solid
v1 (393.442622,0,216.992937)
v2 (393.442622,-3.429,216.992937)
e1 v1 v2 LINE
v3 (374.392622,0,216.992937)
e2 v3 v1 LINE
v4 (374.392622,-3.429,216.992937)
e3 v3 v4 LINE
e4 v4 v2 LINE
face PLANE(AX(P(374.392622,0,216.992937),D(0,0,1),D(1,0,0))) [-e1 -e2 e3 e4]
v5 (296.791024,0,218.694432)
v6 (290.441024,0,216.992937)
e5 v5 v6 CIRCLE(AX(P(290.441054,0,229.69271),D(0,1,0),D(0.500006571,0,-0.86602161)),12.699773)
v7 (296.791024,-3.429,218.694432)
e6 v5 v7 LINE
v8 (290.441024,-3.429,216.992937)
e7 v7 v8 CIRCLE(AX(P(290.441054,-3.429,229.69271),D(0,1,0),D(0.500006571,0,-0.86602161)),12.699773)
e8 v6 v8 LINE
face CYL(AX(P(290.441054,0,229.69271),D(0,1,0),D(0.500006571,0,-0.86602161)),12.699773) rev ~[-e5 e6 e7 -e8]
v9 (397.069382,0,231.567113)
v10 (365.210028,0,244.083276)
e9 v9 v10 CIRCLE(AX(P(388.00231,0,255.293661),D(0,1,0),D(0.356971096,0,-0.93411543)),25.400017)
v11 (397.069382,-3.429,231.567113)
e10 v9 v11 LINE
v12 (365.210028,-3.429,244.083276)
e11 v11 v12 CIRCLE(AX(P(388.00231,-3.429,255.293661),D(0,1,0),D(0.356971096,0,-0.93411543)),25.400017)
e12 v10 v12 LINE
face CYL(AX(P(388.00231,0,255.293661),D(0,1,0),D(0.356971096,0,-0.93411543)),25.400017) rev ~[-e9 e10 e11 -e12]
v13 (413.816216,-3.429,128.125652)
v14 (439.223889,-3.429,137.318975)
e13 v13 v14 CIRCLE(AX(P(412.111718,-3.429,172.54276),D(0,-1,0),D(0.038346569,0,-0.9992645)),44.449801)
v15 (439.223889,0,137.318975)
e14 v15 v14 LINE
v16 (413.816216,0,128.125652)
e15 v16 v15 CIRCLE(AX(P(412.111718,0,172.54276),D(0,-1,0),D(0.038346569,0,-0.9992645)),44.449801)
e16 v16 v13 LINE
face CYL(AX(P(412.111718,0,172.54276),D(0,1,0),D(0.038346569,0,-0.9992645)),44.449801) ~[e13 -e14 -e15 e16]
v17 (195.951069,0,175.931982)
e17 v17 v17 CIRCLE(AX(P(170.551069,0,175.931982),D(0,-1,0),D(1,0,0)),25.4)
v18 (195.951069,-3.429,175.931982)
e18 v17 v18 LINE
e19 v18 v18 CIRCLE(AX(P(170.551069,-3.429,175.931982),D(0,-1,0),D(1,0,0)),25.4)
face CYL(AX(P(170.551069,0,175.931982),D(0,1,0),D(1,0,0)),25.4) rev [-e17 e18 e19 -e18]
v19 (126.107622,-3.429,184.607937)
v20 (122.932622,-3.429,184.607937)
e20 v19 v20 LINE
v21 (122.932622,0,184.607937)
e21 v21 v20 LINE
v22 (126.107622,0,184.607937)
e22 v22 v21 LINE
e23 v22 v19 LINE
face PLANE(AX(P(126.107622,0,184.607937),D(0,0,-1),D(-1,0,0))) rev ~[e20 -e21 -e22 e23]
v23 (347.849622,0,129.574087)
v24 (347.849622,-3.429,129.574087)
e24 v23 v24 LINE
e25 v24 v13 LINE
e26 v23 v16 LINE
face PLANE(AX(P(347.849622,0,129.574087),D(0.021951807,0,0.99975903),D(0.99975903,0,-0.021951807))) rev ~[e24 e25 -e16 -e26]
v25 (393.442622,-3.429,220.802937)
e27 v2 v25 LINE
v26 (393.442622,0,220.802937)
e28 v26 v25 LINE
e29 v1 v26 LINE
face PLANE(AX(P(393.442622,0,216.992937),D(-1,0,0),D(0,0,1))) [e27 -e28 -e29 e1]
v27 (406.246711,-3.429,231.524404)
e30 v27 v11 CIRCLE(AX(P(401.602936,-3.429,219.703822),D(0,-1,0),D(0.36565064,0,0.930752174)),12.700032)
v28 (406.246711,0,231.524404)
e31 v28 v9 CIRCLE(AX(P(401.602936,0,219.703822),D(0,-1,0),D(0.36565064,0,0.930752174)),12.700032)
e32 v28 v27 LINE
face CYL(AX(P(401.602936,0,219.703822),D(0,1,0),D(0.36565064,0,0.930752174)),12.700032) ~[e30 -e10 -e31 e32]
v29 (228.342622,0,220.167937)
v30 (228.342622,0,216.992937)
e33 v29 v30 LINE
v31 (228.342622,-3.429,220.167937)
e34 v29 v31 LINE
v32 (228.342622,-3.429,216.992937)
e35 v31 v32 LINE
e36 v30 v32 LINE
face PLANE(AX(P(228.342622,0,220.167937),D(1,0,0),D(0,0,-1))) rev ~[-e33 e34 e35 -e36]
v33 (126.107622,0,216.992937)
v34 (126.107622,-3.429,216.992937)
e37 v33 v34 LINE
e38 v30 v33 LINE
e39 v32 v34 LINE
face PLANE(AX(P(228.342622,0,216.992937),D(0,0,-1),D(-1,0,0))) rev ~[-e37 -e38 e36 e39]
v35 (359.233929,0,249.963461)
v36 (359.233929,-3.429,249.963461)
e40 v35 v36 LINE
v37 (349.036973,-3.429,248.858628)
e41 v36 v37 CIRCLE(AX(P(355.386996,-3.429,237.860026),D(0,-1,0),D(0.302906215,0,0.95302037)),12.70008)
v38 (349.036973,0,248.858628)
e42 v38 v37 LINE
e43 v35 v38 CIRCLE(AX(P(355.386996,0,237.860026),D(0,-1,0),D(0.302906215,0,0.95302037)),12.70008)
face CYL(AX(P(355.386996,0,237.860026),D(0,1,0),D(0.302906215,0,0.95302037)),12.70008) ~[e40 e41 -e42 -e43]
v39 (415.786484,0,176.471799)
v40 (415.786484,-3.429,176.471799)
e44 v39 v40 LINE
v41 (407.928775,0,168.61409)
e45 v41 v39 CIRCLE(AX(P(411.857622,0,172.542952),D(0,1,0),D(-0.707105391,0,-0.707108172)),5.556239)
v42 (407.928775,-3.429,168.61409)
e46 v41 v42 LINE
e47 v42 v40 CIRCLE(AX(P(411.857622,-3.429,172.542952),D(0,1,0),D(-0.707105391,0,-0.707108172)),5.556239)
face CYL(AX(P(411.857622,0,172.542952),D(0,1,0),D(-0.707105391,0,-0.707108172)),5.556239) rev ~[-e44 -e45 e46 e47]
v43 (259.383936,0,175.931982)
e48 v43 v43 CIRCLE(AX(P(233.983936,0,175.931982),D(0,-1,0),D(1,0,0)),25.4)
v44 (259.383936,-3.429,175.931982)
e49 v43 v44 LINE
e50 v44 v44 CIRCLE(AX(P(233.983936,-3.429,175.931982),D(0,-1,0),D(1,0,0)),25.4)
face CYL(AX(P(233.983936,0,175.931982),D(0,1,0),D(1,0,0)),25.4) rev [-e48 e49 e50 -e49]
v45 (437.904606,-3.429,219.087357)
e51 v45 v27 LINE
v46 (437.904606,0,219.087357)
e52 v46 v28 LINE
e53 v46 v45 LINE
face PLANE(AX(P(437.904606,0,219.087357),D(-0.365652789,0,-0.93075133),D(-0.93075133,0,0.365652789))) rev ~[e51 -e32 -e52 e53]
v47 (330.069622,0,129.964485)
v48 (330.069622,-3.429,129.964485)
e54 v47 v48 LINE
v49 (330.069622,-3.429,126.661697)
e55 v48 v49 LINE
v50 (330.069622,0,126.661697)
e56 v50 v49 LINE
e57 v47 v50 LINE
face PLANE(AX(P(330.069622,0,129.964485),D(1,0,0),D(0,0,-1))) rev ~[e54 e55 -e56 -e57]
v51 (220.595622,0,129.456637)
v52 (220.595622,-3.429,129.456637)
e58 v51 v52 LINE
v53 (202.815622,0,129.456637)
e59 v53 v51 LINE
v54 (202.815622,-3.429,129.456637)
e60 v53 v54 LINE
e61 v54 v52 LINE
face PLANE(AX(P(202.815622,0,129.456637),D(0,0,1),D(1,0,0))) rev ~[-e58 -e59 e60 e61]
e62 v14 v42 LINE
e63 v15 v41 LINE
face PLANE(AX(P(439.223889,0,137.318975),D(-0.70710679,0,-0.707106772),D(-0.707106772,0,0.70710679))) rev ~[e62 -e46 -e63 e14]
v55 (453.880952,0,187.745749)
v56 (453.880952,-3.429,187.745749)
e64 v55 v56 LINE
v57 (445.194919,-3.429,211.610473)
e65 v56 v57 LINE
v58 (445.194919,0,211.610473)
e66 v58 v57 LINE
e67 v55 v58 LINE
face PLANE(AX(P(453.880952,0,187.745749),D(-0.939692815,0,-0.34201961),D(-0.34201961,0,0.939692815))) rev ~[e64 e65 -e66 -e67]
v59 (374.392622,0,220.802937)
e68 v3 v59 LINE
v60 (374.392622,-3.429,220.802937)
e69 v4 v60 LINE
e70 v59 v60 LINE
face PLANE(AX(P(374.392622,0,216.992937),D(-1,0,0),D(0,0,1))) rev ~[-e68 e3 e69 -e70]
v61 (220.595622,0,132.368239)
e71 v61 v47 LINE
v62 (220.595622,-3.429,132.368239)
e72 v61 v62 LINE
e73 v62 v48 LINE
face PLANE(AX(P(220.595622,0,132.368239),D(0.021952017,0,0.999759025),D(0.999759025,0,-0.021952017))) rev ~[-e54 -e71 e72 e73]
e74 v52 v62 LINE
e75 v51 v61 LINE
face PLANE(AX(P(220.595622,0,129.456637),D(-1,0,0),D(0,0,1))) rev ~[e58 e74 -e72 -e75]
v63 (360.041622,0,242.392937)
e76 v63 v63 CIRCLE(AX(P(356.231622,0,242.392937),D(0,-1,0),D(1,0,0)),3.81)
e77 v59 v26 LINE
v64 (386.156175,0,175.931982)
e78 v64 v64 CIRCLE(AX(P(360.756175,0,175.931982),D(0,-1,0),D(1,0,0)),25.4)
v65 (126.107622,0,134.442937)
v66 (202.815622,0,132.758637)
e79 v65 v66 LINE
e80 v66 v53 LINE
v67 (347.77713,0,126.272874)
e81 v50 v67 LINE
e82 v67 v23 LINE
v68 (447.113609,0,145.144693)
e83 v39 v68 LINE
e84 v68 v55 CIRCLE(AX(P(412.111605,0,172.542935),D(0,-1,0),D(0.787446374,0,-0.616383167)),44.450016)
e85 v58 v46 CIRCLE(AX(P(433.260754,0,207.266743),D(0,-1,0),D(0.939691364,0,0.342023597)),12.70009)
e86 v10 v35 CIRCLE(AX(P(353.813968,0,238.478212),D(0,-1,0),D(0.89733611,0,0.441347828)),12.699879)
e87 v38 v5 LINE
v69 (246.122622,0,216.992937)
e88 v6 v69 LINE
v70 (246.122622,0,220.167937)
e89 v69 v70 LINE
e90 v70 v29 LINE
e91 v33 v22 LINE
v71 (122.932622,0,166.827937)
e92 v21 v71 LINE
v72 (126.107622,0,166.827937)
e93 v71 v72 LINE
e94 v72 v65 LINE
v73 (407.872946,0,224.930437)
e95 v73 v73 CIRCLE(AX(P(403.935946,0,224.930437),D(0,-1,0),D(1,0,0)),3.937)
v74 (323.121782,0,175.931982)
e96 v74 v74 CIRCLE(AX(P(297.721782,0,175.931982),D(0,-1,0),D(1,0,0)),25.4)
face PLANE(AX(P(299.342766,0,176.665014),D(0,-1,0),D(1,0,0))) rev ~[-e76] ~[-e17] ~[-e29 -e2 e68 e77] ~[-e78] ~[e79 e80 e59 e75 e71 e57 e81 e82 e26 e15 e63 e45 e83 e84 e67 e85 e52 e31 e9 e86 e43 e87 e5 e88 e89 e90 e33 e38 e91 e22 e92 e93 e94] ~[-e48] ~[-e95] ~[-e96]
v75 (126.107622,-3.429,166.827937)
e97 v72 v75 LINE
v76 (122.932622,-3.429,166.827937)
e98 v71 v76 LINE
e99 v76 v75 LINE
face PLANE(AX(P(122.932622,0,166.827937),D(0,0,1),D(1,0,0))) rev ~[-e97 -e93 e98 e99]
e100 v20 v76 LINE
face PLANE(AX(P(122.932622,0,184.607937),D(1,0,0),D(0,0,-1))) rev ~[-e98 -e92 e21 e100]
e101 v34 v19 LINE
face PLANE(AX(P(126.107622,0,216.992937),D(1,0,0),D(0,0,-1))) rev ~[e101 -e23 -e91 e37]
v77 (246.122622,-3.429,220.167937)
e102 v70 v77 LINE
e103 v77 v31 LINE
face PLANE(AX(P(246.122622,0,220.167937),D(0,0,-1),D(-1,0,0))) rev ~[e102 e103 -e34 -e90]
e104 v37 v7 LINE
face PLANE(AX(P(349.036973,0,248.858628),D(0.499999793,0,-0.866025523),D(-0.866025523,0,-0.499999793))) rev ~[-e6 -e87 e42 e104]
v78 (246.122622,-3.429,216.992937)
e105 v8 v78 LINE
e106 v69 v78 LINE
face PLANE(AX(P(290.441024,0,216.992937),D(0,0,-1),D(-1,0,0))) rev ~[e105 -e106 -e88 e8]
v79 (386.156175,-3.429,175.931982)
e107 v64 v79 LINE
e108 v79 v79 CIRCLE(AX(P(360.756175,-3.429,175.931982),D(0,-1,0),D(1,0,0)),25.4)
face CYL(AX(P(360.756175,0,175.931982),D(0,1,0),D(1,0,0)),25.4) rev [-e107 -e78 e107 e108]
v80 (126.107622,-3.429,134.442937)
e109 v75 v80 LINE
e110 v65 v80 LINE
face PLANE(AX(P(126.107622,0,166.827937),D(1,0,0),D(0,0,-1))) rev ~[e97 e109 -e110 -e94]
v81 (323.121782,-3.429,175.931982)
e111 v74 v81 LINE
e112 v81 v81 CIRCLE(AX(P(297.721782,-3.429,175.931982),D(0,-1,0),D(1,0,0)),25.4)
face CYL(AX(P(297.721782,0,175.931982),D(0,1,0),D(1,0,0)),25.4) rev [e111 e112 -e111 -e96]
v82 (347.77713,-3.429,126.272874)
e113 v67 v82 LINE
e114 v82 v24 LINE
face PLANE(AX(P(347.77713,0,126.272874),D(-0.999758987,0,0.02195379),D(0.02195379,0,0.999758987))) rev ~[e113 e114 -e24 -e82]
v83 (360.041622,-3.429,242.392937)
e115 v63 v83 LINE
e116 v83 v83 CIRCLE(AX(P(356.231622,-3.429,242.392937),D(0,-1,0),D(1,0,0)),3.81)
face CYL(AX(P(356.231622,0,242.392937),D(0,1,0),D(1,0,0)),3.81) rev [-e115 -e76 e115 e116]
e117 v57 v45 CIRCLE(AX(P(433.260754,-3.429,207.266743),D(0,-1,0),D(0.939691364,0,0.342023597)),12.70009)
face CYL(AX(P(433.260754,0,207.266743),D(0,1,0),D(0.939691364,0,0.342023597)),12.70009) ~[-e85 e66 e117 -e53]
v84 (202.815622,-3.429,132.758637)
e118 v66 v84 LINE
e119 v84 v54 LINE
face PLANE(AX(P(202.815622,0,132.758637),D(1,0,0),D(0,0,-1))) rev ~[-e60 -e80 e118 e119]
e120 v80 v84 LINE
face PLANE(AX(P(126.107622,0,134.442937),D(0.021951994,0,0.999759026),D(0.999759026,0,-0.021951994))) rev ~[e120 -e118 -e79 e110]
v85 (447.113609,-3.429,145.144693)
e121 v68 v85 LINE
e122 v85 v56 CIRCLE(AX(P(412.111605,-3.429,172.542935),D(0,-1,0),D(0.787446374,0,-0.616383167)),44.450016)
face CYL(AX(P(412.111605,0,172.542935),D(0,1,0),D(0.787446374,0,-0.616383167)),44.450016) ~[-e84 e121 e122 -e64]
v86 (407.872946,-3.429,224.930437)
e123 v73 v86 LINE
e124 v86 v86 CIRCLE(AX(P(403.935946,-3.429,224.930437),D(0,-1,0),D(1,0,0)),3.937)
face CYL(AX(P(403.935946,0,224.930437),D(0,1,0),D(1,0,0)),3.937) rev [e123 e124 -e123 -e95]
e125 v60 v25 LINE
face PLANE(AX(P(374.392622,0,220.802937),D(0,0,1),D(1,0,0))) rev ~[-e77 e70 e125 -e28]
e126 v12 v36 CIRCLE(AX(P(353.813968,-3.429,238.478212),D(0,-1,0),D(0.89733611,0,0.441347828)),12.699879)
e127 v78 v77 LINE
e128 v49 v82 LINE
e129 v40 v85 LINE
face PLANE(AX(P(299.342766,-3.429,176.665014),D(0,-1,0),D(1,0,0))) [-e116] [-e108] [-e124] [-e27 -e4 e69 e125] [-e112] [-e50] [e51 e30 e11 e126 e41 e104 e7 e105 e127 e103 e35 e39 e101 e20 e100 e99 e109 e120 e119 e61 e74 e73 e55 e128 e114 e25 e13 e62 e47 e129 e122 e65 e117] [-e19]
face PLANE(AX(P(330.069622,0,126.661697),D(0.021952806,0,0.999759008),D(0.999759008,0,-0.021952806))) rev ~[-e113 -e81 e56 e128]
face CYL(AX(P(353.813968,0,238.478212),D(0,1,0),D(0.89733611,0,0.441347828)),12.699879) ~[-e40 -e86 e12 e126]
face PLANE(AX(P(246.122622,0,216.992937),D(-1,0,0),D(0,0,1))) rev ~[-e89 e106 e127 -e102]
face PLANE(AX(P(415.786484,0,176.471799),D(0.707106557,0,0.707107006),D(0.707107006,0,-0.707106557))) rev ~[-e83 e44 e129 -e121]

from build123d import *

# Parameters (mm, degrees)
F0_R     = 25.4
F0_W     = 19.05
F0_H     = 3.81
F0_R_2   = 3.81
F0_R_3   = 3.937
F1_DEPTH = 3.429


# Not quite as in the source:
# - ends of sketch curves that miss each other by under 0.0002 mm in the source are joined


with BuildPart() as f1:
    # F0 (on Front) → F1 (new body)
    with BuildSketch(Plane.XZ):
        with BuildLine():
            Line((122.9326218, 166.8279366), (126.1076218, 166.8279366))
            Line((126.1076218, 166.8279366), (126.1076218, 134.4429366))
            Line((126.1076218, 134.4429366), (202.8156218, 132.7586372))
            Line((202.8156218, 132.7586372), (202.8156218, 129.4566372))
            Line((202.8156218, 129.4566372), (220.5956218, 129.4566372))
            Line((220.5956218, 129.4566372), (220.5956218, 132.3682392))
            Line((220.5956218, 132.3682392), (330.0696218, 129.9644848))
            Line((330.0696218, 129.9644848), (330.0696218, 126.6616974))
            Line((330.0696218, 126.6616974), (347.7771302, 126.2728742))
            Line((347.7771302, 126.2728742), (347.8496218, 129.5740868))
            Line((347.8496218, 129.5740868), (413.8162158, 128.1256518))
            ThreePointArc((413.8162158, 128.1256518), (427.2355191442, 130.7449674015), (439.2238892088, 137.3189752107))
            Line((439.2238892088, 137.3189752107), (407.9287752, 168.61409))
            ThreePointArc((407.9287752, 168.61409), (407.928759747, 176.471798653), (415.786483853, 176.471798653))
            Line((415.786483853, 176.471798653), (447.1136092, 145.1446932))
            ThreePointArc((447.1136092, 145.1446932), (456.0111791953, 165.5693177048), (453.8809524214, 187.7457494791))
            Line((453.8809524214, 187.7457494791), (445.1949186, 211.6104734))
            ThreePointArc((445.1949186, 211.6104734), (442.3538053066, 216.1328975514), (437.9046056469, 219.0873571921))
            Line((437.9046056469, 219.0873571921), (406.246711, 231.5244036))
            ThreePointArc((406.246711, 231.5244036), (401.6620386638, 232.4037156495), (397.069381607, 231.5671130188))
            ThreePointArc((397.069381607, 231.5671130188), (378.7147395647, 231.6525545857), (365.2100276158, 244.0832755023))
            ThreePointArc((365.2100276158, 244.0832755023), (362.7212006534, 247.5307318984), (359.2339287197, 249.9634606203))
            ThreePointArc((359.2339287197, 249.9634606203), (354.0189561213, 250.4862087964), (349.0369734787, 248.858627921))
            Line((349.0369734787, 248.858627921), (296.7910244, 218.6944318))
            ThreePointArc((296.7910244, 218.6944318), (293.728030578, 217.4256797597), (290.4410244, 216.9929366))
            Line((290.4410244, 216.9929366), (246.1226218, 216.9929366))
            Line((246.1226218, 216.9929366), (246.1226218, 220.1679366))
            Line((246.1226218, 220.1679366), (228.3426218, 220.1679366))
            Line((228.3426218, 220.1679366), (228.3426218, 216.9929366))
            Line((228.3426218, 216.9929366), (126.1076218, 216.9929366))
            Line((126.1076218, 216.9929366), (126.1076218, 184.6079366))
            Line((126.1076218, 184.6079366), (122.9326218, 184.6079366))
            Line((122.9326218, 184.6079366), (122.9326218, 166.8279366))
        make_face()
        with Locations((170.5510686, 175.9319824)):
            Circle(F0_R, mode=Mode.SUBTRACT)
        with Locations((233.9839364, 175.9319824)):
            Circle(F0_R, mode=Mode.SUBTRACT)
        with Locations((297.721782, 175.9319824)):
            Circle(F0_R, mode=Mode.SUBTRACT)
        with Locations((360.7561746, 175.9319824)):
            Circle(F0_R, mode=Mode.SUBTRACT)
        with Locations((383.9176218, 218.8979366)):
            Rectangle(F0_W, F0_H, mode=Mode.SUBTRACT)
        with Locations((356.2316218, 242.3929366)):
            Circle(F0_R_2, mode=Mode.SUBTRACT)
        with Locations((403.935946, 224.9304366)):
            Circle(F0_R_3, mode=Mode.SUBTRACT)
    extrude(amount=F1_DEPTH)


solid = f1.part
